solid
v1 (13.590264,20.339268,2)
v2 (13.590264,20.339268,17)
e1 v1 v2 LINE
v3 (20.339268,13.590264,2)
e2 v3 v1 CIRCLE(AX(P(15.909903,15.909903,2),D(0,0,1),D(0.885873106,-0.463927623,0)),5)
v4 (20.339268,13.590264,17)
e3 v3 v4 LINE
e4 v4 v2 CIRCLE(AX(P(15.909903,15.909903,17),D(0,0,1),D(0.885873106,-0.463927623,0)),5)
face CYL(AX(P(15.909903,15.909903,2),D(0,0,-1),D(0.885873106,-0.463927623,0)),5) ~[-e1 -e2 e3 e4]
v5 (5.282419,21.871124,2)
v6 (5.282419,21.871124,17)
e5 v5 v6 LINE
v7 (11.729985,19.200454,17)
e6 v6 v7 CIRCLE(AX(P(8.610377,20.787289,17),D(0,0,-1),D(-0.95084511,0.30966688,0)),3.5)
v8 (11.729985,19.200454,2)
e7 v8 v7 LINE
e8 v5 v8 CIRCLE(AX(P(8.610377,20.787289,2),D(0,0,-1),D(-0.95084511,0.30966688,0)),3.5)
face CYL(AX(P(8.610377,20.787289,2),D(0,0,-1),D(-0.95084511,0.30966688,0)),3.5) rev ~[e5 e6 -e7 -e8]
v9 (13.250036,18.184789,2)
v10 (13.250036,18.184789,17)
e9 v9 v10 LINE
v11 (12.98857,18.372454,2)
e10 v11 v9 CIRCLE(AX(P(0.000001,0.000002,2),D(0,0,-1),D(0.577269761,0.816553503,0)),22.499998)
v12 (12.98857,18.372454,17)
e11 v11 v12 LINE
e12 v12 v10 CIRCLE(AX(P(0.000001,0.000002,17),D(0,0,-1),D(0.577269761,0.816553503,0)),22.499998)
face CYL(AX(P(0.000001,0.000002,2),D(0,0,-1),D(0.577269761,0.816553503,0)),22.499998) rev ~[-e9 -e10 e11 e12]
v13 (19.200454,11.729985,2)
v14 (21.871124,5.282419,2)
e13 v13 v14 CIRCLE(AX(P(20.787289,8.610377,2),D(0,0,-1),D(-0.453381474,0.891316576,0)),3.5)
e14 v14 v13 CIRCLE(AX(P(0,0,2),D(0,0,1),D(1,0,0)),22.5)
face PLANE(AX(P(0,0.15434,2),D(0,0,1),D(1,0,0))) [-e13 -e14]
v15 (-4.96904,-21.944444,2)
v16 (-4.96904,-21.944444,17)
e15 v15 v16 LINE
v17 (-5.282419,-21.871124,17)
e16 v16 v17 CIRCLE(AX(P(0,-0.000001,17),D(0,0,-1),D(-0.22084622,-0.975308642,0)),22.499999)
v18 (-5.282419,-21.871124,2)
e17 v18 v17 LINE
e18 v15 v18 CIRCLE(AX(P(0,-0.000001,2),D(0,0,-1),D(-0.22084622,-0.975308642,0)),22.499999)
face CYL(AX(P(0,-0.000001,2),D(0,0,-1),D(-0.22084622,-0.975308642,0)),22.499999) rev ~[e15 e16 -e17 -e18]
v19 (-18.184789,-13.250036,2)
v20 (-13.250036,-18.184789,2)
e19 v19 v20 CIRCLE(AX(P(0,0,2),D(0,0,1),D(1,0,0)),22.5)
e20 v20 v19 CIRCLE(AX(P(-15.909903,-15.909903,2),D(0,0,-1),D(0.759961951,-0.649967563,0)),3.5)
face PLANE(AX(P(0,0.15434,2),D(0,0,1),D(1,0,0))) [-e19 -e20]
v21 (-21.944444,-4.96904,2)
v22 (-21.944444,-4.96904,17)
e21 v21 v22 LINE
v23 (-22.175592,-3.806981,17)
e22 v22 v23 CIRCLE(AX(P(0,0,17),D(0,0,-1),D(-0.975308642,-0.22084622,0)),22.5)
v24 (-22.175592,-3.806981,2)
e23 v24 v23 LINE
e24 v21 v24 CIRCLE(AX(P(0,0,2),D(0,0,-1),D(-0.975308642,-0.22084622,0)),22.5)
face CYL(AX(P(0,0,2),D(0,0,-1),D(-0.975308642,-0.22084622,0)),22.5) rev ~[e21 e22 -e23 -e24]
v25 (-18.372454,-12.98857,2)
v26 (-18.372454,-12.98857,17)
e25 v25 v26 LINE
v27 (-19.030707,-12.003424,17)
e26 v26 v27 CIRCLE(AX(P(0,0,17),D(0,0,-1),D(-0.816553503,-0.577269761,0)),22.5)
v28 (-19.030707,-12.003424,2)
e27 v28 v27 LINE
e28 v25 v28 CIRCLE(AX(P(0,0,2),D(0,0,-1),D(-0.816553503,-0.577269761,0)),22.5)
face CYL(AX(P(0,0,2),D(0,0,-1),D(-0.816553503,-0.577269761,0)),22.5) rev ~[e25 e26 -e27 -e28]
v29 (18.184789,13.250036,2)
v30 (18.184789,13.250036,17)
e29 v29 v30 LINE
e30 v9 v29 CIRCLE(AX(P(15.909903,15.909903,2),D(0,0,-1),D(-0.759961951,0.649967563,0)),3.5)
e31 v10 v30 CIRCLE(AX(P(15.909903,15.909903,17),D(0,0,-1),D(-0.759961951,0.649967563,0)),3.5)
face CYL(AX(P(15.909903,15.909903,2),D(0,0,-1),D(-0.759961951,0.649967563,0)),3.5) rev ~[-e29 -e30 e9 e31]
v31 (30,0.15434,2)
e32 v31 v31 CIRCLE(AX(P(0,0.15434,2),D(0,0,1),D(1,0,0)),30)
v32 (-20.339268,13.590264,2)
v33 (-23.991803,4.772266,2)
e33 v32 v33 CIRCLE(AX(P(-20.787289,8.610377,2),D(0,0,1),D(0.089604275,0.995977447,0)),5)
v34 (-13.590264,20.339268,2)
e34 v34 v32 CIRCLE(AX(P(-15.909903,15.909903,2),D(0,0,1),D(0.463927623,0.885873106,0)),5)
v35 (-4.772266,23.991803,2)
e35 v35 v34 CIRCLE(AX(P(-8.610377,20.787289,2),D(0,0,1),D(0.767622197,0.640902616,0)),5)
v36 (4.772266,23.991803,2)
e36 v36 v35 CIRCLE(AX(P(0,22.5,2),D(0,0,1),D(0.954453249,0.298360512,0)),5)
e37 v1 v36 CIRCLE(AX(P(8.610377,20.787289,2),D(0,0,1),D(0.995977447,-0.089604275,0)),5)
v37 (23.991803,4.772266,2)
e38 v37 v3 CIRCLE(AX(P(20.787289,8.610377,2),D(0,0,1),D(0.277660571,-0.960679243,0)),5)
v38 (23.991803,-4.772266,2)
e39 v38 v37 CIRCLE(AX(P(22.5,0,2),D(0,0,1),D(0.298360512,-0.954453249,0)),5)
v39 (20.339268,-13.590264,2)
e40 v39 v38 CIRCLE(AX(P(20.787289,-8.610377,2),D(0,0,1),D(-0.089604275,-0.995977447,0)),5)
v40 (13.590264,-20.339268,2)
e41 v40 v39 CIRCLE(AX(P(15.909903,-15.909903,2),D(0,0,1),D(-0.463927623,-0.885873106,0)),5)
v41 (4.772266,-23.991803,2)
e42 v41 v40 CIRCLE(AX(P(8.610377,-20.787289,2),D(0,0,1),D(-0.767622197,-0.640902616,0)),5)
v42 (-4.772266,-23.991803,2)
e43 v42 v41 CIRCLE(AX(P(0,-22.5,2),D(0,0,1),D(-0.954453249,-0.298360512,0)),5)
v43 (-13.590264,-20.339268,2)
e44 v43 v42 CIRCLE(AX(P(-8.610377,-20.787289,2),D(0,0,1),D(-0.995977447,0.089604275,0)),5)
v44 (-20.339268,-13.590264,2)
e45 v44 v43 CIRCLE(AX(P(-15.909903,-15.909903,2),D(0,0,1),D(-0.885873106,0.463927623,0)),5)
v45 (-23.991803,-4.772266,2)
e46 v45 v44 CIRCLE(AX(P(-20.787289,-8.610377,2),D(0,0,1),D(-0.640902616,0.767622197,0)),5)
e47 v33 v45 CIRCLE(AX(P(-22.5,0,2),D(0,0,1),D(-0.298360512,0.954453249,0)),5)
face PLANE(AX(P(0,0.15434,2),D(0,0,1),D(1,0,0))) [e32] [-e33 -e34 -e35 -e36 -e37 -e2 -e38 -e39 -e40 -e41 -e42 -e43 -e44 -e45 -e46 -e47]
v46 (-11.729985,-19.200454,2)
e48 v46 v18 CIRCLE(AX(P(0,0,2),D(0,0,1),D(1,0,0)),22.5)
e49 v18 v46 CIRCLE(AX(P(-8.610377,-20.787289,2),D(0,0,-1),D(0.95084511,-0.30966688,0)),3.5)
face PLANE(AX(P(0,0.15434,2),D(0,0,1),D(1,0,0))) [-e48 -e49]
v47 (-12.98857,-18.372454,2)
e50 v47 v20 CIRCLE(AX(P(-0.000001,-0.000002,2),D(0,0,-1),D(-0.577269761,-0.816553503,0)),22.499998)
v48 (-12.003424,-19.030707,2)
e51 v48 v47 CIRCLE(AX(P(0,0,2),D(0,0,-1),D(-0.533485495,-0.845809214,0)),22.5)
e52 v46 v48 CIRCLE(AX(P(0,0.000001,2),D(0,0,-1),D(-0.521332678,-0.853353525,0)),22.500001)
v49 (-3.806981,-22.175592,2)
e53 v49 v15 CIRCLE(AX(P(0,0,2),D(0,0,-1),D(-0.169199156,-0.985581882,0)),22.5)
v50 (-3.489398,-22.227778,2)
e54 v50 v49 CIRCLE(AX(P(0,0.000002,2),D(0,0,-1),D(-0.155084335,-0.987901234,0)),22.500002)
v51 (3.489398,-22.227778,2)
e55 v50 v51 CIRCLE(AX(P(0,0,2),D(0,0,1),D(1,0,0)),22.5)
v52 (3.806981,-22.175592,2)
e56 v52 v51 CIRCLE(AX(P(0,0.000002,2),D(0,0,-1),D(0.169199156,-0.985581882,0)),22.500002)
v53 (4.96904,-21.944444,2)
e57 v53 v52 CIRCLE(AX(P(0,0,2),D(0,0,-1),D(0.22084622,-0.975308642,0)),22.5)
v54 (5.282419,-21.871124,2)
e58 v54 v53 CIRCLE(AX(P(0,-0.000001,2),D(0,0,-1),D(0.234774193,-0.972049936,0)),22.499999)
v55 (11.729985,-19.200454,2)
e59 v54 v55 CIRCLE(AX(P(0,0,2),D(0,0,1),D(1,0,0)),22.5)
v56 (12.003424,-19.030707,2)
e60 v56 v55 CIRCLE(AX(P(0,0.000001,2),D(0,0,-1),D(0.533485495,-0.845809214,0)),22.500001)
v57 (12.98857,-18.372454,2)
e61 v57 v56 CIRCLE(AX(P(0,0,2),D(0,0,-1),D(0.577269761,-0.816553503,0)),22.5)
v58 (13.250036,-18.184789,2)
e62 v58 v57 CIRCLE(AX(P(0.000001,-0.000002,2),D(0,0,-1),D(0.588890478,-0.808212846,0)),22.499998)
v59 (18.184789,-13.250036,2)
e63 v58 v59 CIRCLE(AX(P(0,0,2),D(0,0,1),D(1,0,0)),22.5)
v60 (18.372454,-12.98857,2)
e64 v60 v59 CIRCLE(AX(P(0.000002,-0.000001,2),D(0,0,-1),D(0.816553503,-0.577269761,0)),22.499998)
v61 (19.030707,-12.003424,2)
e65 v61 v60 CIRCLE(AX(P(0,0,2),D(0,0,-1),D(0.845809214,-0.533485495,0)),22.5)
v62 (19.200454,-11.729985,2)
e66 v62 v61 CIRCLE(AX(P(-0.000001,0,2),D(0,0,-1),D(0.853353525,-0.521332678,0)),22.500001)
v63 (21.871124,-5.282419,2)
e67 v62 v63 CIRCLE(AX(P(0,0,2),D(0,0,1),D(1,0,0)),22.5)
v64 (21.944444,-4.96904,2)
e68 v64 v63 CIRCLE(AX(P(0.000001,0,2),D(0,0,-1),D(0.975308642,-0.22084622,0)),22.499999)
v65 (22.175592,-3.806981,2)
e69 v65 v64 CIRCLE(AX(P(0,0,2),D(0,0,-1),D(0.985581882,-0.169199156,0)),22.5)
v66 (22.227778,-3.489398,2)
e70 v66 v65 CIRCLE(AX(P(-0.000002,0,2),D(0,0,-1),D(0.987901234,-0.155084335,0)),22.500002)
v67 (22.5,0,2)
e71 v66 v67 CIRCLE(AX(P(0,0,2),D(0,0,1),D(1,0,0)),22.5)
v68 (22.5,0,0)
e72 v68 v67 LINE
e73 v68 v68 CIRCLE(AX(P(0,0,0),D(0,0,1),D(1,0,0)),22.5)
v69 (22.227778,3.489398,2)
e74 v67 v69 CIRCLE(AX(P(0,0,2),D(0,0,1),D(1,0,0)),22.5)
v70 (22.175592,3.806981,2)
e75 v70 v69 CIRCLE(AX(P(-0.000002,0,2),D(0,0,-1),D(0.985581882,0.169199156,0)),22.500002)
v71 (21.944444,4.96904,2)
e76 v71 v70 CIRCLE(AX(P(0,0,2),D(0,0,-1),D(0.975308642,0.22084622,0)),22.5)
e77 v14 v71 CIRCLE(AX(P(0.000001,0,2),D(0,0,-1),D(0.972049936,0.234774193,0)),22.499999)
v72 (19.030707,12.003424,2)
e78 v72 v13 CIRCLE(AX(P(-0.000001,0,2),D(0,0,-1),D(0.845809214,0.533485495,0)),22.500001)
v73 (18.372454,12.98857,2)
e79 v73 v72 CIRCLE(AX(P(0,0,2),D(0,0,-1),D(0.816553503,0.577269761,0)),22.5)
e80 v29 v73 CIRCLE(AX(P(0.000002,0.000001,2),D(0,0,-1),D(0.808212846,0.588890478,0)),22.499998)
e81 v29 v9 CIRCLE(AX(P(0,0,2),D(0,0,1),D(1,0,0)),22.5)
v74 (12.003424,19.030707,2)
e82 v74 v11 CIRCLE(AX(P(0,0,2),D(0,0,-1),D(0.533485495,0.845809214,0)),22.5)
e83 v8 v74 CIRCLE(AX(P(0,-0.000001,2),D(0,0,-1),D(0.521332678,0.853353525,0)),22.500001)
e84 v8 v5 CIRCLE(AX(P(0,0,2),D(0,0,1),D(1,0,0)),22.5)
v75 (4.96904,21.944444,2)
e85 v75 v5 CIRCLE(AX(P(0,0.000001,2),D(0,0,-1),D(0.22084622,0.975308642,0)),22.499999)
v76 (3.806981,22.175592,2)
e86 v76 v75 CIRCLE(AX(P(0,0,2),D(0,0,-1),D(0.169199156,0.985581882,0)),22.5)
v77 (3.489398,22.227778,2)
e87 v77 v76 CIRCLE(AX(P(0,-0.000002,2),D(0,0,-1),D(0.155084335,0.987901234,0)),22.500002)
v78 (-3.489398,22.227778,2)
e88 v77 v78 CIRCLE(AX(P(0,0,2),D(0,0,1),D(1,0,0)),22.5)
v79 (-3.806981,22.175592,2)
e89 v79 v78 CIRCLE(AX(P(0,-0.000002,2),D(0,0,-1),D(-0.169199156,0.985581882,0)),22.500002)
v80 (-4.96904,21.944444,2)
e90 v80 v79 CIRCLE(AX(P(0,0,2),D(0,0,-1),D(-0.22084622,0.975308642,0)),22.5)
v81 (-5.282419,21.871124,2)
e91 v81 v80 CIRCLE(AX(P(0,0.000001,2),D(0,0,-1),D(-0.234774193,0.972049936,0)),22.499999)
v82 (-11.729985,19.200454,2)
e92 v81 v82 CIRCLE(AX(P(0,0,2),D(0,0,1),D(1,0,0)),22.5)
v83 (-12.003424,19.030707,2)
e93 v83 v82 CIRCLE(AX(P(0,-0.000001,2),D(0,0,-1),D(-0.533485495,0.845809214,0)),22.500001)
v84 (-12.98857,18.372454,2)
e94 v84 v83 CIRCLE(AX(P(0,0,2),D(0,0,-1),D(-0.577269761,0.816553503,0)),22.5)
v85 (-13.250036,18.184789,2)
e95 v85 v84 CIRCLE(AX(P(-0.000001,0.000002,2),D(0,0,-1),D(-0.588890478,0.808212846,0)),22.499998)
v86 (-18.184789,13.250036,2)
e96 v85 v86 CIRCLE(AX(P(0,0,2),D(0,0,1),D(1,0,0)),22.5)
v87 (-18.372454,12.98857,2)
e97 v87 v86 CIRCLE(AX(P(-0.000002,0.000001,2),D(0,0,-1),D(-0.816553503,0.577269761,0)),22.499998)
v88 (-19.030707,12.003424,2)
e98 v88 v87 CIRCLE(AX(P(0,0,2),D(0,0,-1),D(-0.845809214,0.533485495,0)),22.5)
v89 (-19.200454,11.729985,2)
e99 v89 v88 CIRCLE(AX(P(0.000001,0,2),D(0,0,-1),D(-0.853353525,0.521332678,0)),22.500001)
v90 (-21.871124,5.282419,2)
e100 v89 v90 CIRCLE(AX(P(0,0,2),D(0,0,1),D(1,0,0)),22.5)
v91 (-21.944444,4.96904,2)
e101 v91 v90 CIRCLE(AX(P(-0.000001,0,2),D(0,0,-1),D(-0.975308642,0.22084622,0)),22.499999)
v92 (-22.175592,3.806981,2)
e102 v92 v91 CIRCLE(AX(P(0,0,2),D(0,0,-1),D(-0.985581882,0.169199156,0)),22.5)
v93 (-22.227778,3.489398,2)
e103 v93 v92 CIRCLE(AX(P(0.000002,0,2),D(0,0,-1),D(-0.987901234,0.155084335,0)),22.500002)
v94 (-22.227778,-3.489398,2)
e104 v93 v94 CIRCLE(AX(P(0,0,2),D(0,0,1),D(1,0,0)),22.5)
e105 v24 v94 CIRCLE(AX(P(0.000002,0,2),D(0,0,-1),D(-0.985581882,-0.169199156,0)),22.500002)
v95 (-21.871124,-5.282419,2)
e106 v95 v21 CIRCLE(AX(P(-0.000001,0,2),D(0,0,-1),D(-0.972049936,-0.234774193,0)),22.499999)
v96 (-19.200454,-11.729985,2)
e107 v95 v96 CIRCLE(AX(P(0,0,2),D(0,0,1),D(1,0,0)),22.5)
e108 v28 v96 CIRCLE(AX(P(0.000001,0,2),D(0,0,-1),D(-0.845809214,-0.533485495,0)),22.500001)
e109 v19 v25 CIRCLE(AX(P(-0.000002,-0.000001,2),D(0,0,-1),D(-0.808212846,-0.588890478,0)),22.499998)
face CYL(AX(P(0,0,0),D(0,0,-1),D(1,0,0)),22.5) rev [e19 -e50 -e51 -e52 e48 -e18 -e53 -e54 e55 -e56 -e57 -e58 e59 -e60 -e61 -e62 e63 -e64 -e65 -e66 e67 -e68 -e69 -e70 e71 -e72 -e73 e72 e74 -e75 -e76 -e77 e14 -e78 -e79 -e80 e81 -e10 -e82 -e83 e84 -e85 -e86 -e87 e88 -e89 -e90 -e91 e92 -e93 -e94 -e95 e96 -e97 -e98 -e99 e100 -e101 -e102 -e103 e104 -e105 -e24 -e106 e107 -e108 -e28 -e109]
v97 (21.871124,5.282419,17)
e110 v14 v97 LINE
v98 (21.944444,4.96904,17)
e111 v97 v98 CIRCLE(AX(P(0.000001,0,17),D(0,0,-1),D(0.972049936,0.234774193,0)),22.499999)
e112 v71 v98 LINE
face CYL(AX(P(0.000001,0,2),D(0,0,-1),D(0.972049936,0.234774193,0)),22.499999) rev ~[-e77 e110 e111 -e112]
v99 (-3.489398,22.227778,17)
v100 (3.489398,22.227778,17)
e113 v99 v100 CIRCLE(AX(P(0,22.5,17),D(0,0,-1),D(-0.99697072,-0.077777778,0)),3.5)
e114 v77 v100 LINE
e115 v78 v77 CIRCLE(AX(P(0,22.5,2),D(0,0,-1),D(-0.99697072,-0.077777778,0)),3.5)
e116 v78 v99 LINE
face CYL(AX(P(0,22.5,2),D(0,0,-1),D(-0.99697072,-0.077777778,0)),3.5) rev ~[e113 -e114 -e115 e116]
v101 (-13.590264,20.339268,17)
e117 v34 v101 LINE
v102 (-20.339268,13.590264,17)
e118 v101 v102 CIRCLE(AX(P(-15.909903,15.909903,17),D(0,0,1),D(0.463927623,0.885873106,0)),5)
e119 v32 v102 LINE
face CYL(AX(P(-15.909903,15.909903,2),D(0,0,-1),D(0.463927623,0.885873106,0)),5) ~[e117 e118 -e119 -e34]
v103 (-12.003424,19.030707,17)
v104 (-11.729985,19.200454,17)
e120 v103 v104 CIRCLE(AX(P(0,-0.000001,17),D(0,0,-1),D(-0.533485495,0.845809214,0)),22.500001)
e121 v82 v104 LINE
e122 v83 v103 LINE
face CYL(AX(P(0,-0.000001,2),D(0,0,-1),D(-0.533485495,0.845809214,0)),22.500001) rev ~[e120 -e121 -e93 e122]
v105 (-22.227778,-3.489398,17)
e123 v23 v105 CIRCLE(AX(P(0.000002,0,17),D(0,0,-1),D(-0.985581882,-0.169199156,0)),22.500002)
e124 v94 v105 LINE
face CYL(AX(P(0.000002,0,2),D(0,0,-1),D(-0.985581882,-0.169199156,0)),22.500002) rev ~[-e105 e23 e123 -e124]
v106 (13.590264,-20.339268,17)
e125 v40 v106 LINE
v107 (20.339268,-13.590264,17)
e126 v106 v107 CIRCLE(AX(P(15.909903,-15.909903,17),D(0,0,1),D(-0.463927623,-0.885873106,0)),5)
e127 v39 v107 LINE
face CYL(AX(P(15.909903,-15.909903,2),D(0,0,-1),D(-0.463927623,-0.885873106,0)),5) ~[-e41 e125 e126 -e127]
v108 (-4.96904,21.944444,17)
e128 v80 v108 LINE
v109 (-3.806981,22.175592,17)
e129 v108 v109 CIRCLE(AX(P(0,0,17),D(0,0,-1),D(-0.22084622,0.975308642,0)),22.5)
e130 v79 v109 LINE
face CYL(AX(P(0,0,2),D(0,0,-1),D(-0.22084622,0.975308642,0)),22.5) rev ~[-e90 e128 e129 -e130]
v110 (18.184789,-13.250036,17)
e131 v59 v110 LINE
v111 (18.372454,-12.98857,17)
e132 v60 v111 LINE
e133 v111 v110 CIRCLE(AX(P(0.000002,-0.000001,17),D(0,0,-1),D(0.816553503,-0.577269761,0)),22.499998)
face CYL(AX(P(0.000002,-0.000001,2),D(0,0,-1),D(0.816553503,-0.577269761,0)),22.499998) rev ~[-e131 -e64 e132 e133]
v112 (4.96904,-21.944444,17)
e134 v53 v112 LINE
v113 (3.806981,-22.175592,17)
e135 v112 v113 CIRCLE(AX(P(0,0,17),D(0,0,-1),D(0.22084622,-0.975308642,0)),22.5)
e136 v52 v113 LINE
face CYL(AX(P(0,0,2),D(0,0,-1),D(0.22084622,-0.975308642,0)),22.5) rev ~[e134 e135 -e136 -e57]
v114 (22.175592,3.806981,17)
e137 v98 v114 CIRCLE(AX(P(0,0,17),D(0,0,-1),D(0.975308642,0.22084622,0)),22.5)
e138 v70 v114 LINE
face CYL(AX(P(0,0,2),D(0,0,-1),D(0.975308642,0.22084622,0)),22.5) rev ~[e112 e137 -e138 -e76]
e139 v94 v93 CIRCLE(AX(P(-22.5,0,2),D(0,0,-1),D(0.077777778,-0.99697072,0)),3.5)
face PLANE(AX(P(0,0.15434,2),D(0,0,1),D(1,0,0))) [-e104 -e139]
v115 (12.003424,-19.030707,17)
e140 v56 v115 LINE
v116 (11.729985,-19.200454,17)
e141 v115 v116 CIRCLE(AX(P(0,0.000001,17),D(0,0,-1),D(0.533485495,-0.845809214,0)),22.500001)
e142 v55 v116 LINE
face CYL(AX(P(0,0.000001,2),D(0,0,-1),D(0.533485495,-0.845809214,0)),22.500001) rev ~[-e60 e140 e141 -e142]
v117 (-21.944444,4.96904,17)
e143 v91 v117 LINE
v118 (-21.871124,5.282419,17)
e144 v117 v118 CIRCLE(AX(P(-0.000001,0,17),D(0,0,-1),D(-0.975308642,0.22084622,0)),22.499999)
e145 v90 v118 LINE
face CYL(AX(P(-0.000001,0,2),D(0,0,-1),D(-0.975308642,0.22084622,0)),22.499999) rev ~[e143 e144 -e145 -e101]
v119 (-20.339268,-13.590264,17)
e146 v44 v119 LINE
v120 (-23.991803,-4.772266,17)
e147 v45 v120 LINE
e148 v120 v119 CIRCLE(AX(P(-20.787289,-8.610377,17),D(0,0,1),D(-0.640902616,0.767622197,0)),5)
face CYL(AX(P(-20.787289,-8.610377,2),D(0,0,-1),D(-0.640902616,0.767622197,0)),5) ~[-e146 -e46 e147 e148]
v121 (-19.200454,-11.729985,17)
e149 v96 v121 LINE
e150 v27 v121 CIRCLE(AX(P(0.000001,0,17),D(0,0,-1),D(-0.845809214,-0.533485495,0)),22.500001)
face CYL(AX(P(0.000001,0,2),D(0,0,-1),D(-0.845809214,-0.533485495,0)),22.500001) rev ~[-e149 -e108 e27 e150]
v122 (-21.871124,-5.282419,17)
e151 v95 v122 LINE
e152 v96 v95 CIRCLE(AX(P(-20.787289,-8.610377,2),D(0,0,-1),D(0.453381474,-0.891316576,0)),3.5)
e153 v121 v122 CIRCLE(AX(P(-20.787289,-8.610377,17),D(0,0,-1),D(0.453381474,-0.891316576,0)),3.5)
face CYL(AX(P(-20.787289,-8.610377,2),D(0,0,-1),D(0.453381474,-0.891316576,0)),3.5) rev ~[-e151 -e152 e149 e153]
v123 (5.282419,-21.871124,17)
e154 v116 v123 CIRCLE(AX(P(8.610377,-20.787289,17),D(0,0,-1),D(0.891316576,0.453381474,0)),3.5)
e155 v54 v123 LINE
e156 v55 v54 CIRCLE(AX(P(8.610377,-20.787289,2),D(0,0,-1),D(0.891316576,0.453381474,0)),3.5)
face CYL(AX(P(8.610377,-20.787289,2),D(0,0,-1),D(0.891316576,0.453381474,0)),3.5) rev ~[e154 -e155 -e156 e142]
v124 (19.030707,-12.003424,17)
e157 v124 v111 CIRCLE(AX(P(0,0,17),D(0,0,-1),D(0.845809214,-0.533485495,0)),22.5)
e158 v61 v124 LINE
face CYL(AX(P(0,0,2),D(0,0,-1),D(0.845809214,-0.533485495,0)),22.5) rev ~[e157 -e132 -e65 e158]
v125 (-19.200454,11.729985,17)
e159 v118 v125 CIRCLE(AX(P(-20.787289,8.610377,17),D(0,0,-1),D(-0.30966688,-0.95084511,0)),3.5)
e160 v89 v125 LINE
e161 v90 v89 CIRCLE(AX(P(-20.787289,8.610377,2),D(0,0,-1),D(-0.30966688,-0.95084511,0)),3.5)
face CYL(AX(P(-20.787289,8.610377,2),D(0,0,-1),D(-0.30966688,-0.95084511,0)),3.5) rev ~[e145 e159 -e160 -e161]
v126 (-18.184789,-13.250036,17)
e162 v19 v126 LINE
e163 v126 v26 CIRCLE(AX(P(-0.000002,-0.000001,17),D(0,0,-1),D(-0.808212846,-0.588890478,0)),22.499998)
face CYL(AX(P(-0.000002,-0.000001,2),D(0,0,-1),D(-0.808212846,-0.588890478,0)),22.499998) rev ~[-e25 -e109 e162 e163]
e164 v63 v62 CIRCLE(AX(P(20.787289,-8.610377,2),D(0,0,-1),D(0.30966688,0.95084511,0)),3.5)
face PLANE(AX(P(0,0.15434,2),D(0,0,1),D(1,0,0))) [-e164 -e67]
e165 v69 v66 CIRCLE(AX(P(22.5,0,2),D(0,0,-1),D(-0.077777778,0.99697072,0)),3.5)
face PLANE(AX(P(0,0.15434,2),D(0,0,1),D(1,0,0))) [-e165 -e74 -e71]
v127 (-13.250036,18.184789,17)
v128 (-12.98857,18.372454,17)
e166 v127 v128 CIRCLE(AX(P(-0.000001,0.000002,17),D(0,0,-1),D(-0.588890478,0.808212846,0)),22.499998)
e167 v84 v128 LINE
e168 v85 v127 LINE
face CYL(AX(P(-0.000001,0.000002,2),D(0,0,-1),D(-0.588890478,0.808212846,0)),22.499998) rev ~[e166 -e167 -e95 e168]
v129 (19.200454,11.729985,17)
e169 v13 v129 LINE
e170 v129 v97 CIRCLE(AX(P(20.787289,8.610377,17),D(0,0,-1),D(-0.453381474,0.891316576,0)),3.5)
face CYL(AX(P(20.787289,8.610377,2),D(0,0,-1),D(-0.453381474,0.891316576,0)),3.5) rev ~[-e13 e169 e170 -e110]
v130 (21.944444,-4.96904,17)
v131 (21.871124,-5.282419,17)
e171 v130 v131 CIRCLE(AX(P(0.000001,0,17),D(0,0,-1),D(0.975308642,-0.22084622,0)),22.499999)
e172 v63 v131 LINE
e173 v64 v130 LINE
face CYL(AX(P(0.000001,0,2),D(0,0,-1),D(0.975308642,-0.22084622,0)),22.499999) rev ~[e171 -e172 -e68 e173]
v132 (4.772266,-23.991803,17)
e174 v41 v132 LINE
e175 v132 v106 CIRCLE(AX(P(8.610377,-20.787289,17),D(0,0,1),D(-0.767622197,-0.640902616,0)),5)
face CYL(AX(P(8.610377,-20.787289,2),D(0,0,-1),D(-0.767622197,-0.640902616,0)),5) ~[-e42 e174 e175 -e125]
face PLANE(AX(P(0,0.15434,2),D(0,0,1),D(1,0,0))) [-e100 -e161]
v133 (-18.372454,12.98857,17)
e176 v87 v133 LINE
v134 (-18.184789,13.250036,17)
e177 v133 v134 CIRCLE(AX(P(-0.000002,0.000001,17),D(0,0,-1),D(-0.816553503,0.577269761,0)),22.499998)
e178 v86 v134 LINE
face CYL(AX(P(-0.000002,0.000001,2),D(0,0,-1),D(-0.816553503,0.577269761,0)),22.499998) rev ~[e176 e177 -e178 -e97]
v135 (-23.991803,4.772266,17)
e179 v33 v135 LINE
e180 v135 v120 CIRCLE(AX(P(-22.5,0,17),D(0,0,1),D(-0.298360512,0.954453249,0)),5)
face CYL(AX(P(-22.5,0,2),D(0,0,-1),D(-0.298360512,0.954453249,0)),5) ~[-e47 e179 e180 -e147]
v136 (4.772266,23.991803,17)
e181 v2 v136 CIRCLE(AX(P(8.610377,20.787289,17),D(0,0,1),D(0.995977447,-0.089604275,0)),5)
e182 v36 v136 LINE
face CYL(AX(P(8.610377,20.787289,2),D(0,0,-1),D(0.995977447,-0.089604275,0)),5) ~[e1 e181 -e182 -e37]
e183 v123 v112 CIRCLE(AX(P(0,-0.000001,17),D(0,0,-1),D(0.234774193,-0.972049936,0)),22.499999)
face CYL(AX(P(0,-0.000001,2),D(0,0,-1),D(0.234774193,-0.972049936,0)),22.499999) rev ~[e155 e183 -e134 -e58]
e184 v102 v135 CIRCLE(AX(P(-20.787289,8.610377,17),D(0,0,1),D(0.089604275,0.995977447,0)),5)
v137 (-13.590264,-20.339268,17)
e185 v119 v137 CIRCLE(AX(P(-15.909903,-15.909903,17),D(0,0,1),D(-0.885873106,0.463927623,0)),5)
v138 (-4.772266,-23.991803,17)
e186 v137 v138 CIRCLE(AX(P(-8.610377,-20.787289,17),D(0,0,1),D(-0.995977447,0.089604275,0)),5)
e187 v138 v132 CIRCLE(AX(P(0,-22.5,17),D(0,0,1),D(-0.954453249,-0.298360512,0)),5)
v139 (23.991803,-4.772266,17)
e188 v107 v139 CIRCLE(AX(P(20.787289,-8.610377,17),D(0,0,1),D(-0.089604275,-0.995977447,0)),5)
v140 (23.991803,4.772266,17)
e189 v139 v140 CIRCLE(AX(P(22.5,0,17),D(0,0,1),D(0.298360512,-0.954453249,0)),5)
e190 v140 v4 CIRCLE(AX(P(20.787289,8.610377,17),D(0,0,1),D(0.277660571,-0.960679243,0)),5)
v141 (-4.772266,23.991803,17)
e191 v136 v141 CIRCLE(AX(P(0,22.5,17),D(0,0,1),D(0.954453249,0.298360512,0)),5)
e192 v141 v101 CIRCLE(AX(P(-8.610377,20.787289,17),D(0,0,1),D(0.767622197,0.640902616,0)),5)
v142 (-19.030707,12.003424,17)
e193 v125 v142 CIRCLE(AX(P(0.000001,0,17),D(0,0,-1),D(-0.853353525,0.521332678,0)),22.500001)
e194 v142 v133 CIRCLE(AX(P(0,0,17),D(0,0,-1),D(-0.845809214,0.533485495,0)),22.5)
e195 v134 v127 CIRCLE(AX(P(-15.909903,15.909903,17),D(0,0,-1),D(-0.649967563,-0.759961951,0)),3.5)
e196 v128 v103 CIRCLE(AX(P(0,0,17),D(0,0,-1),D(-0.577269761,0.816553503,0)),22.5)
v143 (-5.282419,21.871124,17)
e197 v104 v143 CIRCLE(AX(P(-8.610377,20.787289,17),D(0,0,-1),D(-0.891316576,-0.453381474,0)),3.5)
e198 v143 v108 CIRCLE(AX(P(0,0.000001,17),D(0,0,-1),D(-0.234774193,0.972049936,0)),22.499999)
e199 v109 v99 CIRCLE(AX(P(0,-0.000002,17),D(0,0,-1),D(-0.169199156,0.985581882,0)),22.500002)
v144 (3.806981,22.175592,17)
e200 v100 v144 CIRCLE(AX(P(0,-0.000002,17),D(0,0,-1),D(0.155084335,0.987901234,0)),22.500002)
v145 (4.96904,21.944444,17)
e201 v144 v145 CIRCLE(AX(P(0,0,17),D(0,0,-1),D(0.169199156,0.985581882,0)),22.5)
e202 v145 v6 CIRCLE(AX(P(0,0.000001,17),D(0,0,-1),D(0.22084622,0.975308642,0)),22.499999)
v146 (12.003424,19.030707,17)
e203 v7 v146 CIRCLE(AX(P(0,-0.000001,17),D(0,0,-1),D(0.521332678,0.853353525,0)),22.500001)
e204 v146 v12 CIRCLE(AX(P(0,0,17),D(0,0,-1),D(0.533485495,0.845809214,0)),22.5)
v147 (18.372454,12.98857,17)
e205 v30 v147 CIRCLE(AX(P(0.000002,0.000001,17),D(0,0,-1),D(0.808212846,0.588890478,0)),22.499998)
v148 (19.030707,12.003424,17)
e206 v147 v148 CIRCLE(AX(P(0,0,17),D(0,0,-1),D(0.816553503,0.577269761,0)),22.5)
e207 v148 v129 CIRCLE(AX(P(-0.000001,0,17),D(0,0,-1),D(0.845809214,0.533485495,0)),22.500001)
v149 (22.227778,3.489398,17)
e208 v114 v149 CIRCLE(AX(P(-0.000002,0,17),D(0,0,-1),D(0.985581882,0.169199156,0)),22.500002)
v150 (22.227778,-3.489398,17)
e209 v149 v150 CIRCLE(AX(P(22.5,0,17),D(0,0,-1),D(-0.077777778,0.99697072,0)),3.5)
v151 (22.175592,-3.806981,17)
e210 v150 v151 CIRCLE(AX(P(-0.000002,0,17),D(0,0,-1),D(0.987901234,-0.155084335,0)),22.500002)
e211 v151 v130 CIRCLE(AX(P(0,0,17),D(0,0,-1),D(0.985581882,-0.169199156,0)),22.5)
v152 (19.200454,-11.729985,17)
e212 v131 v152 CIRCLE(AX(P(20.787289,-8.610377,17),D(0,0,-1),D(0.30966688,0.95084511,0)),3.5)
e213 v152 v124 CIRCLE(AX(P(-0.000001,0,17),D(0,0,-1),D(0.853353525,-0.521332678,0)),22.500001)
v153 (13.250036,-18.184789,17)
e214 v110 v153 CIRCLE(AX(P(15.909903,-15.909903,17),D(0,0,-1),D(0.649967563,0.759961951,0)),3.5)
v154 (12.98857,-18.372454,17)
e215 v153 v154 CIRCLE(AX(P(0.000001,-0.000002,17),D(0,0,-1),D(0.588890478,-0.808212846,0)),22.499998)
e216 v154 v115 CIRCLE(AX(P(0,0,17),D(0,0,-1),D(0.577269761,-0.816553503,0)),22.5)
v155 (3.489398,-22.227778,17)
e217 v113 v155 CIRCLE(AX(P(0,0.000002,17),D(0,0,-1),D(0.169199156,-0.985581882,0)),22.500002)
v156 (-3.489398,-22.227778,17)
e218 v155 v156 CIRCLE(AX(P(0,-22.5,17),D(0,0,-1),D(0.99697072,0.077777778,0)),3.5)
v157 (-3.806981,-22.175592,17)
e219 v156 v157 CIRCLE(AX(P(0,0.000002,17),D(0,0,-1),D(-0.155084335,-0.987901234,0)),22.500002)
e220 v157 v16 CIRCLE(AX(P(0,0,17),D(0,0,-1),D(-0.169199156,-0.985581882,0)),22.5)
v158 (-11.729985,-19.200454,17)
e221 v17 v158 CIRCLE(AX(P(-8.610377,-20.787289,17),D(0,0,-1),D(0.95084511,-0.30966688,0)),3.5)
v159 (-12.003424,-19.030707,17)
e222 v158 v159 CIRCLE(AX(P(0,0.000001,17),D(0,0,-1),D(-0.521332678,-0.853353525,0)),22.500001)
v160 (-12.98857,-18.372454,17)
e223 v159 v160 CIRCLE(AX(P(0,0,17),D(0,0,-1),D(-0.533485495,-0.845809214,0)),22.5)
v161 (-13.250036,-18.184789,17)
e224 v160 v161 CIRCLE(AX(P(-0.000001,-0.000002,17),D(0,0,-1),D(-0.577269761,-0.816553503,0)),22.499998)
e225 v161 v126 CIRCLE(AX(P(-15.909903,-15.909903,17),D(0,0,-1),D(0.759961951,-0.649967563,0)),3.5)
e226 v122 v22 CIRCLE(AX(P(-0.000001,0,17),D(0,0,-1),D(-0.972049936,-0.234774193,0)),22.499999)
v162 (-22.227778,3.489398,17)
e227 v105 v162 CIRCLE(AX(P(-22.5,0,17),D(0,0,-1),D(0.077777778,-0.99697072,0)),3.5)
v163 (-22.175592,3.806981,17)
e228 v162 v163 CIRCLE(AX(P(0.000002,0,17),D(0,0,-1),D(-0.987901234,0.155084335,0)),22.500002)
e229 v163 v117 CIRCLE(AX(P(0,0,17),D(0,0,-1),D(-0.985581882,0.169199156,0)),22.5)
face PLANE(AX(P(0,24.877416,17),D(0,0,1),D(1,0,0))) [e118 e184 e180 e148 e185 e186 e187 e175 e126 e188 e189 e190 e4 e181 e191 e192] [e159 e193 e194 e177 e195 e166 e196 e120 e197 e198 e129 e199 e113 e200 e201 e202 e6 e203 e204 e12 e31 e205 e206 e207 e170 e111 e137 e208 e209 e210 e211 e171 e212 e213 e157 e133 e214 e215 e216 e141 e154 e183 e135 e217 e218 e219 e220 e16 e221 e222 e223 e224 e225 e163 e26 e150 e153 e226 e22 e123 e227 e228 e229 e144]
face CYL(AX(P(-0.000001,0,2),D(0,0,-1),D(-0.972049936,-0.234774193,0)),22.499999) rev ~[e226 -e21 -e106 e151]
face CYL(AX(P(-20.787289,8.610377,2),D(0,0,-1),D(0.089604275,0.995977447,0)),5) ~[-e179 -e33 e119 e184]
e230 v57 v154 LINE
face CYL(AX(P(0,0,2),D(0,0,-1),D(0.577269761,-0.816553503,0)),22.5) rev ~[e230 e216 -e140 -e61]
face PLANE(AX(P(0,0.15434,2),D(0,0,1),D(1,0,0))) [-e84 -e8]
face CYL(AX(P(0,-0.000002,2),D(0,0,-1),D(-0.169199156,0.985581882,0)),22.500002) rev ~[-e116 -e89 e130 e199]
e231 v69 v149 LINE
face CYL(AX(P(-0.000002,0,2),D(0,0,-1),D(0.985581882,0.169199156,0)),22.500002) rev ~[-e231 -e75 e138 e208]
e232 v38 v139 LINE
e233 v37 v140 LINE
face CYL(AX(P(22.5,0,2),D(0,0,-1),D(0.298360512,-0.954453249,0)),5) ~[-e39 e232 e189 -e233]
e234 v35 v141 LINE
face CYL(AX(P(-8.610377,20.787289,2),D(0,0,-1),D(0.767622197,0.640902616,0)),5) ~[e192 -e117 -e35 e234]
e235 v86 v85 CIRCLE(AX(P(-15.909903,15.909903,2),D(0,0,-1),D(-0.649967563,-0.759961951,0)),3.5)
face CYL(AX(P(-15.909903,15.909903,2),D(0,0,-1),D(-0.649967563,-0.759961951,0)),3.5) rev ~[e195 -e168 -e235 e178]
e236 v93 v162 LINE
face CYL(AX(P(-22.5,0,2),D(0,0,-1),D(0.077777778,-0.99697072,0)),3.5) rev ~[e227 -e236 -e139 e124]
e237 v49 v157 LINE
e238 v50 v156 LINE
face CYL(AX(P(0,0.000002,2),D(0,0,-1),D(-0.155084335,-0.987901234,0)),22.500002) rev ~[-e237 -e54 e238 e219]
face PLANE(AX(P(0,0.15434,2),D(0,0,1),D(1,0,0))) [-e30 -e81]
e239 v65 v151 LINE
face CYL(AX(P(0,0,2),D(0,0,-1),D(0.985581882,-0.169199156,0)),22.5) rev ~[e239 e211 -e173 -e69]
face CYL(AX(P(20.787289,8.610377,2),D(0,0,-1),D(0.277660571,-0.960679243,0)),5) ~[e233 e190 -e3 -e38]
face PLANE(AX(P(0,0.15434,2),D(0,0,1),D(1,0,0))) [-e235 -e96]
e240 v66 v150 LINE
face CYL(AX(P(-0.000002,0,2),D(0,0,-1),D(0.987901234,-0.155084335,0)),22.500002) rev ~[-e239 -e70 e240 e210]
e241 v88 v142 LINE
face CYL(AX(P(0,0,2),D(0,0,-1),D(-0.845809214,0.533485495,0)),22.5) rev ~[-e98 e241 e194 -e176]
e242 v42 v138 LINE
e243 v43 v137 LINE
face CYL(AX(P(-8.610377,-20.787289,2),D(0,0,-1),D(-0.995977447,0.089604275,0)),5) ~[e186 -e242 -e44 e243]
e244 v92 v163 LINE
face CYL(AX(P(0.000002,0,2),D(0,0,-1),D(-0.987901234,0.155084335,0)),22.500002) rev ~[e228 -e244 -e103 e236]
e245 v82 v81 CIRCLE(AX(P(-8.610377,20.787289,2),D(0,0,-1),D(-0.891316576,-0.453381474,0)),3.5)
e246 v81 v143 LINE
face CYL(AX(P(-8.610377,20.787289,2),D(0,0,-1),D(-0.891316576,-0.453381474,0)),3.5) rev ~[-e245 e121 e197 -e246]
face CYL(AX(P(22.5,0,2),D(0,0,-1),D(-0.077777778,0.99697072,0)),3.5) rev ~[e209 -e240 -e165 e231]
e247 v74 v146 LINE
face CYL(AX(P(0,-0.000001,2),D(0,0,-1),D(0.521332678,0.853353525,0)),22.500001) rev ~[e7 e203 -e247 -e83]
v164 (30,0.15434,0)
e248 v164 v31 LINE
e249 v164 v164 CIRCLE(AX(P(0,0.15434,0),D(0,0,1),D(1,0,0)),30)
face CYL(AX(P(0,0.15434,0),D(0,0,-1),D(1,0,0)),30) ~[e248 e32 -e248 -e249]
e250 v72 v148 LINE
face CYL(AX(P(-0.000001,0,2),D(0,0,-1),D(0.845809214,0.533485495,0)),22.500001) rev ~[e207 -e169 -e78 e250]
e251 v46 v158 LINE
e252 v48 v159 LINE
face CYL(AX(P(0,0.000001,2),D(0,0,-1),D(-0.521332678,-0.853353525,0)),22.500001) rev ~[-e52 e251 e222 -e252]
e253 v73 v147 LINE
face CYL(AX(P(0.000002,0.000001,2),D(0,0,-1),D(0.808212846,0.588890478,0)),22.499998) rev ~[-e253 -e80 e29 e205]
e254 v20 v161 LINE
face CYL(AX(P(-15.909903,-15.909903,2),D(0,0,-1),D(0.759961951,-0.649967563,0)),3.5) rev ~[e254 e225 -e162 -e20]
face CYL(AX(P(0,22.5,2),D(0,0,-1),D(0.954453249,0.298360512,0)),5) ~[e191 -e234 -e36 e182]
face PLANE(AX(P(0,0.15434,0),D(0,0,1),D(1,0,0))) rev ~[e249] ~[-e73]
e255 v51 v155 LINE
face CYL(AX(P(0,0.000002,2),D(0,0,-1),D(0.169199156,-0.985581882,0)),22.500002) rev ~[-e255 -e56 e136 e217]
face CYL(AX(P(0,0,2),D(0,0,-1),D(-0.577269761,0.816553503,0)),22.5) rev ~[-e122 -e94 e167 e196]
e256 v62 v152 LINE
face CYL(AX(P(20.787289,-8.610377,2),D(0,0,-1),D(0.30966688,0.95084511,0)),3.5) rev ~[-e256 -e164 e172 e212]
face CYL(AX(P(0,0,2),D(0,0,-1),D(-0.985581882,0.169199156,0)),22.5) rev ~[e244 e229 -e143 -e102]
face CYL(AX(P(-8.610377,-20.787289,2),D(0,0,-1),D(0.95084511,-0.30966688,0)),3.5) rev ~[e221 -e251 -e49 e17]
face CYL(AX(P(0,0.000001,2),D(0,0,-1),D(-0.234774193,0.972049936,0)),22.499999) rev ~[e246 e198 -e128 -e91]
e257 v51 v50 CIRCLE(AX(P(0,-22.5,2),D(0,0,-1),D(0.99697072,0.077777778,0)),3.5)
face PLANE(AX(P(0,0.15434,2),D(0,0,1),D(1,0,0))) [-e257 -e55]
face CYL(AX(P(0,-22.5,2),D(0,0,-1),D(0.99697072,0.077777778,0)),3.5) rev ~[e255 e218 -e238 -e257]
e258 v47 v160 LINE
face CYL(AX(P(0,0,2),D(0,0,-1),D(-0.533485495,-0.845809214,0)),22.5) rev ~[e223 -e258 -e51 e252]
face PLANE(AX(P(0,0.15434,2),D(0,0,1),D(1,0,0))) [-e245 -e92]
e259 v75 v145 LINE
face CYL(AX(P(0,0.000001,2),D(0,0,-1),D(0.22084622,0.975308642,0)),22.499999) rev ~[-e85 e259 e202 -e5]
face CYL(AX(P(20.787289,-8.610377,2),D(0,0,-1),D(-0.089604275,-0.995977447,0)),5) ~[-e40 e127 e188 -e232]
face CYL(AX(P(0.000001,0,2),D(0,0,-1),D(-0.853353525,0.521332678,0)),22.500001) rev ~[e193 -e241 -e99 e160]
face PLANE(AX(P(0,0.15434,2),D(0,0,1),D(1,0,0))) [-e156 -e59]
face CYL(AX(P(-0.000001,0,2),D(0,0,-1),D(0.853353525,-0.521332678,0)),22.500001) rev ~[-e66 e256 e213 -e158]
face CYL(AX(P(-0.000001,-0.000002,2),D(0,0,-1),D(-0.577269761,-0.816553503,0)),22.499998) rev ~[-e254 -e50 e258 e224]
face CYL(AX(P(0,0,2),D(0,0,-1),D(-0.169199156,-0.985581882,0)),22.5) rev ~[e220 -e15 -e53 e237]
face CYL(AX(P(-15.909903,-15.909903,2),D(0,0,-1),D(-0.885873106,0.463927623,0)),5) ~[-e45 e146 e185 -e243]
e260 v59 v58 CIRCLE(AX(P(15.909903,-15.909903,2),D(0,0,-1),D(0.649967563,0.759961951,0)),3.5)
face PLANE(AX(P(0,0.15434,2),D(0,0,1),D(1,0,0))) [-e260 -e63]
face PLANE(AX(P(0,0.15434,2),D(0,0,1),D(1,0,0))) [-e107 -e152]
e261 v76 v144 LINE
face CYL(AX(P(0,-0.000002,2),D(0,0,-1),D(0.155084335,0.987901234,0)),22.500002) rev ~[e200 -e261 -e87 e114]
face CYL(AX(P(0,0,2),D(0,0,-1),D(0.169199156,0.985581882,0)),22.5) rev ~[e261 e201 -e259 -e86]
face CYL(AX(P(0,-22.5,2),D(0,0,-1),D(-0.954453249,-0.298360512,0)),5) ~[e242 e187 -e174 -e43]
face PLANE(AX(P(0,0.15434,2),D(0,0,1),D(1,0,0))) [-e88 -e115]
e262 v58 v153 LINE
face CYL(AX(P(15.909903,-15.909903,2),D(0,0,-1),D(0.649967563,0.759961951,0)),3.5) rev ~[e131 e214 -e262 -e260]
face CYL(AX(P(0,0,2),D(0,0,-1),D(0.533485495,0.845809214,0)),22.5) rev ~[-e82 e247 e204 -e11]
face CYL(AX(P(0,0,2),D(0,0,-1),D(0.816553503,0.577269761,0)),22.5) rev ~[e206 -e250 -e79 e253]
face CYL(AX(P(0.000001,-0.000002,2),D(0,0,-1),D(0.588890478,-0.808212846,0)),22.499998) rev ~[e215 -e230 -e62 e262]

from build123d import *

# Parameters (mm, degrees)
F0_R     = 30
F0_R_2   = 22.5
F1_DEPTH = 2
F3_DEPTH = 15


# Not quite as in the source:
# - after a boolean that leaves OpenCascade's solid faulty, fix() repairs it


with BuildPart() as f1:
    # F0 (on Top) → F1 (new body)
    with BuildSketch(Plane.XY):
        with Locations((0, 0.1543397957)):
            Circle(F0_R)
        Circle(F0_R_2, mode=Mode.SUBTRACT)
    extrude(amount=F1_DEPTH)

    # F2 (on face) → F3 (join)
    with BuildSketch(Plane.XY.offset(2)):
        with BuildLine():
            ThreePointArc((-3.8069810153, 22.1755923382), (-3.6482825778, 22.2022529089), (-3.4893975213, 22.2277777778))
            ThreePointArc((-3.4893975213, 22.2277777778), (0, 26), (3.4893975213, 22.2277777778))
            ThreePointArc((3.4893975213, 22.2277777778), (3.6482825778, 22.2022529089), (3.8069810153, 22.1755923382))
            ThreePointArc((3.8069810153, 22.1755923382), (4.1952253001, 23.1338685771), (4.7722662453, 23.991802562))
            ThreePointArc((4.7722662453, 23.991802562), (0, 27.5), (-4.7722662453, 23.991802562))
            ThreePointArc((-4.7722662453, 23.991802562), (-4.1952253001, 23.1338685771), (-3.8069810153, 22.1755923382))
        make_face()
        with BuildLine():
            ThreePointArc((-4.96903995, 21.9444444444), (-4.3895322454, 22.0676688091), (-3.8069810153, 22.1755923382))
            ThreePointArc((-3.8069810153, 22.1755923382), (-4.1952253001, 23.1338685771), (-4.7722662453, 23.991802562))
            ThreePointArc((-4.7722662453, 23.991802562), (-4.9770654419, 22.9783509036), (-4.96903995, 21.9444444444))
        make_face()
        with BuildLine():
            ThreePointArc((-5.2824193431, 21.8711235624), (-5.125860747, 21.9083443373), (-4.96903995, 21.9444444444))
            ThreePointArc((-4.96903995, 21.9444444444), (-4.9770654419, 22.9783509036), (-4.7722662453, 23.991802562))
            ThreePointArc((-4.7722662453, 23.991802562), (-10.52379439, 25.4066871441), (-13.5902644608, 20.3392681081))
            ThreePointArc((-13.5902644608, 20.3392681081), (-12.72883102, 19.7674644688), (-12.0034236314, 19.0307073207))
            ThreePointArc((-12.0034236314, 19.0307073207), (-11.8670079519, 19.1160697391), (-11.7299852446, 19.2004543218))
            ThreePointArc((-11.7299852446, 19.2004543218), (-9.9497692415, 24.0208678453), (-5.2824193431, 21.8711235624))
        make_face()
        with BuildLine():
            ThreePointArc((4.7722662453, 23.991802562), (4.1952253001, 23.1338685771), (3.8069810153, 22.1755923382))
            ThreePointArc((3.8069810153, 22.1755923382), (4.3895322454, 22.0676688091), (4.96903995, 21.9444444444))
            ThreePointArc((4.96903995, 21.9444444444), (4.9770654419, 22.9783509036), (4.7722662453, 23.991802562))
        make_face()
        with BuildLine():
            ThreePointArc((13.5902644608, 20.3392681081), (10.52379439, 25.4066871441), (4.7722662453, 23.991802562))
            ThreePointArc((4.7722662453, 23.991802562), (4.9770654419, 22.9783509036), (4.96903995, 21.9444444444))
            ThreePointArc((4.96903995, 21.9444444444), (5.125860747, 21.9083443373), (5.2824193431, 21.8711235624))
            ThreePointArc((5.2824193431, 21.8711235624), (9.9497692415, 24.0208678453), (11.7299852446, 19.2004543218))
            ThreePointArc((11.7299852446, 19.2004543218), (11.8670079519, 19.1160697391), (12.0034236314, 19.0307073207))
            ThreePointArc((12.0034236314, 19.0307073207), (12.72883102, 19.7674644688), (13.5902644608, 20.3392681081))
        make_face()
        with BuildLine():
            ThreePointArc((-12.0034236314, 19.0307073207), (-12.72883102, 19.7674644688), (-13.5902644608, 20.3392681081))
            ThreePointArc((-13.5902644608, 20.3392681081), (-13.3916430876, 19.3245876043), (-12.9885696274, 18.3724538109))
            ThreePointArc((-12.9885696274, 18.3724538109), (-12.5003302429, 18.7080662768), (-12.0034236314, 19.0307073207))
        make_face()
        with BuildLine():
            ThreePointArc((-12.9885696274, 18.3724538109), (-13.3916430876, 19.3245876043), (-13.5902644608, 20.3392681081))
            ThreePointArc((-13.5902644608, 20.3392681081), (-19.4454364826, 19.4454364826), (-20.3392681081, 13.5902644608))
            ThreePointArc((-20.3392681081, 13.5902644608), (-19.3245876043, 13.3916430876), (-18.3724538109, 12.9885696274))
            ThreePointArc((-18.3724538109, 12.9885696274), (-18.27908894, 13.1196382391), (-18.1847890469, 13.2500357478))
            ThreePointArc((-18.1847890469, 13.2500357478), (-18.3847763109, 18.3847763109), (-13.2500357478, 18.1847890469))
            ThreePointArc((-13.2500357478, 18.1847890469), (-13.1196382391, 18.27908894), (-12.9885696274, 18.3724538109))
        make_face()
        with BuildLine():
            ThreePointArc((12.9885696274, 18.3724538109), (13.3916430876, 19.3245876043), (13.5902644608, 20.3392681081))
            ThreePointArc((13.5902644608, 20.3392681081), (12.72883102, 19.7674644688), (12.0034236314, 19.0307073207))
            ThreePointArc((12.0034236314, 19.0307073207), (12.5003302429, 18.7080662768), (12.9885696274, 18.3724538109))
        make_face()
        with BuildLine():
            ThreePointArc((20.3392681081, 13.5902644608), (19.4454364826, 19.4454364826), (13.5902644608, 20.3392681081))
            ThreePointArc((13.5902644608, 20.3392681081), (13.3916430876, 19.3245876043), (12.9885696274, 18.3724538109))
            ThreePointArc((12.9885696274, 18.3724538109), (13.1196382391, 18.27908894), (13.2500357478, 18.1847890469))
            ThreePointArc((13.2500357478, 18.1847890469), (18.3847763109, 18.3847763109), (18.1847890469, 13.2500357478))
            ThreePointArc((18.1847890469, 13.2500357478), (18.27908894, 13.1196382391), (18.3724538109, 12.9885696274))
            ThreePointArc((18.3724538109, 12.9885696274), (19.3245876043, 13.3916430876), (20.3392681081, 13.5902644608))
        make_face()
        with BuildLine():
            ThreePointArc((-18.3724538109, 12.9885696274), (-19.3245876043, 13.3916430876), (-20.3392681081, 13.5902644608))
            ThreePointArc((-20.3392681081, 13.5902644608), (-19.7674644688, 12.72883102), (-19.0307073207, 12.0034236314))
            ThreePointArc((-19.0307073207, 12.0034236314), (-18.7080662768, 12.5003302429), (-18.3724538109, 12.9885696274))
        make_face()
        with BuildLine():
            ThreePointArc((-19.0307073207, 12.0034236314), (-19.7674644688, 12.72883102), (-20.3392681081, 13.5902644608))
            ThreePointArc((-20.3392681081, 13.5902644608), (-25.4066871441, 10.52379439), (-23.991802562, 4.7722662453))
            ThreePointArc((-23.991802562, 4.7722662453), (-22.9783509036, 4.9770654419), (-21.9444444444, 4.96903995))
            ThreePointArc((-21.9444444444, 4.96903995), (-21.9083443373, 5.125860747), (-21.8711235624, 5.2824193431))
            ThreePointArc((-21.8711235624, 5.2824193431), (-24.0208678453, 9.9497692415), (-19.2004543218, 11.7299852446))
            ThreePointArc((-19.2004543218, 11.7299852446), (-19.1160697391, 11.8670079519), (-19.0307073207, 12.0034236314))
        make_face()
        with BuildLine():
            ThreePointArc((19.0307073207, 12.0034236314), (19.7674644688, 12.72883102), (20.3392681081, 13.5902644608))
            ThreePointArc((20.3392681081, 13.5902644608), (19.3245876043, 13.3916430876), (18.3724538109, 12.9885696274))
            ThreePointArc((18.3724538109, 12.9885696274), (18.7080662768, 12.5003302429), (19.0307073207, 12.0034236314))
        make_face()
        with BuildLine():
            ThreePointArc((23.991802562, 4.7722662453), (25.4066871441, 10.52379439), (20.3392681081, 13.5902644608))
            ThreePointArc((20.3392681081, 13.5902644608), (19.7674644688, 12.72883102), (19.0307073207, 12.0034236314))
            ThreePointArc((19.0307073207, 12.0034236314), (19.1160697391, 11.8670079519), (19.2004543218, 11.7299852446))
            ThreePointArc((19.2004543218, 11.7299852446), (24.0208678453, 9.9497692415), (21.8711235624, 5.2824193431))
            ThreePointArc((21.8711235624, 5.2824193431), (21.9083443373, 5.125860747), (21.9444444444, 4.96903995))
            ThreePointArc((21.9444444444, 4.96903995), (22.9783509036, 4.9770654419), (23.991802562, 4.7722662453))
        make_face()
        with BuildLine():
            ThreePointArc((-21.9444444444, 4.96903995), (-22.9783509036, 4.9770654419), (-23.991802562, 4.7722662453))
            ThreePointArc((-23.991802562, 4.7722662453), (-23.1338685771, 4.1952253001), (-22.1755923382, 3.8069810153))
            ThreePointArc((-22.1755923382, 3.8069810153), (-22.0676688091, 4.3895322454), (-21.9444444444, 4.96903995))
        make_face()
        with BuildLine():
            ThreePointArc((-22.1755923382, 3.8069810153), (-23.1338685771, 4.1952253001), (-23.991802562, 4.7722662453))
            ThreePointArc((-23.991802562, 4.7722662453), (-27.5, 0), (-23.991802562, -4.7722662453))
            ThreePointArc((-23.991802562, -4.7722662453), (-23.1338685771, -4.1952253001), (-22.1755923382, -3.8069810153))
            ThreePointArc((-22.1755923382, -3.8069810153), (-22.2022529089, -3.6482825778), (-22.2277777778, -3.4893975213))
            ThreePointArc((-22.2277777778, -3.4893975213), (-26, 0), (-22.2277777778, 3.4893975213))
            ThreePointArc((-22.2277777778, 3.4893975213), (-22.2022529089, 3.6482825778), (-22.1755923382, 3.8069810153))
        make_face()
        with BuildLine():
            ThreePointArc((22.1755923382, 3.8069810153), (23.1338685771, 4.1952253001), (23.991802562, 4.7722662453))
            ThreePointArc((23.991802562, 4.7722662453), (22.9783509036, 4.9770654419), (21.9444444444, 4.96903995))
            ThreePointArc((21.9444444444, 4.96903995), (22.0676688091, 4.3895322454), (22.1755923382, 3.8069810153))
        make_face()
        with BuildLine():
            ThreePointArc((23.991802562, -4.7722662453), (27.5, 0), (23.991802562, 4.7722662453))
            ThreePointArc((23.991802562, 4.7722662453), (23.1338685771, 4.1952253001), (22.1755923382, 3.8069810153))
            ThreePointArc((22.1755923382, 3.8069810153), (22.2022529089, 3.6482825778), (22.2277777778, 3.4893975213))
            ThreePointArc((22.2277777778, 3.4893975213), (26, 0), (22.2277777778, -3.4893975213))
            ThreePointArc((22.2277777778, -3.4893975213), (22.2022529089, -3.6482825778), (22.1755923382, -3.8069810153))
            ThreePointArc((22.1755923382, -3.8069810153), (23.1338685771, -4.1952253001), (23.991802562, -4.7722662453))
        make_face()
        with BuildLine():
            ThreePointArc((-22.1755923382, -3.8069810153), (-23.1338685771, -4.1952253001), (-23.991802562, -4.7722662453))
            ThreePointArc((-23.991802562, -4.7722662453), (-22.9783509036, -4.9770654419), (-21.9444444444, -4.96903995))
            ThreePointArc((-21.9444444444, -4.96903995), (-22.0676688091, -4.3895322454), (-22.1755923382, -3.8069810153))
        make_face()
        with BuildLine():
            ThreePointArc((-21.9444444444, -4.96903995), (-22.9783509036, -4.9770654419), (-23.991802562, -4.7722662453))
            ThreePointArc((-23.991802562, -4.7722662453), (-25.4066871441, -10.52379439), (-20.3392681081, -13.5902644608))
            ThreePointArc((-20.3392681081, -13.5902644608), (-19.7674644688, -12.72883102), (-19.0307073207, -12.0034236314))
            ThreePointArc((-19.0307073207, -12.0034236314), (-19.1160697391, -11.8670079519), (-19.2004543218, -11.7299852446))
            ThreePointArc((-19.2004543218, -11.7299852446), (-24.0208678453, -9.9497692415), (-21.8711235624, -5.2824193431))
            ThreePointArc((-21.8711235624, -5.2824193431), (-21.9083443373, -5.125860747), (-21.9444444444, -4.96903995))
        make_face()
        with BuildLine():
            ThreePointArc((21.9444444444, -4.96903995), (22.9783509036, -4.9770654419), (23.991802562, -4.7722662453))
            ThreePointArc((23.991802562, -4.7722662453), (23.1338685771, -4.1952253001), (22.1755923382, -3.8069810153))
            ThreePointArc((22.1755923382, -3.8069810153), (22.0676688091, -4.3895322454), (21.9444444444, -4.96903995))
        make_face()
        with BuildLine():
            ThreePointArc((20.3392681081, -13.5902644608), (25.4066871441, -10.52379439), (23.991802562, -4.7722662453))
            ThreePointArc((23.991802562, -4.7722662453), (22.9783509036, -4.9770654419), (21.9444444444, -4.96903995))
            ThreePointArc((21.9444444444, -4.96903995), (21.9083443373, -5.125860747), (21.8711235624, -5.2824193431))
            ThreePointArc((21.8711235624, -5.2824193431), (24.0208678453, -9.9497692415), (19.2004543218, -11.7299852446))
            ThreePointArc((19.2004543218, -11.7299852446), (19.1160697391, -11.8670079519), (19.0307073207, -12.0034236314))
            ThreePointArc((19.0307073207, -12.0034236314), (19.7674644688, -12.72883102), (20.3392681081, -13.5902644608))
        make_face()
        with BuildLine():
            ThreePointArc((-19.0307073207, -12.0034236314), (-19.7674644688, -12.72883102), (-20.3392681081, -13.5902644608))
            ThreePointArc((-20.3392681081, -13.5902644608), (-19.3245876043, -13.3916430876), (-18.3724538109, -12.9885696274))
            ThreePointArc((-18.3724538109, -12.9885696274), (-18.7080662768, -12.5003302429), (-19.0307073207, -12.0034236314))
        make_face()
        with BuildLine():
            ThreePointArc((-18.3724538109, -12.9885696274), (-19.3245876043, -13.3916430876), (-20.3392681081, -13.5902644608))
            ThreePointArc((-20.3392681081, -13.5902644608), (-19.4454364826, -19.4454364826), (-13.5902644608, -20.3392681081))
            ThreePointArc((-13.5902644608, -20.3392681081), (-13.3916430876, -19.3245876043), (-12.9885696274, -18.3724538109))
            ThreePointArc((-12.9885696274, -18.3724538109), (-13.1196382391, -18.27908894), (-13.2500357478, -18.1847890469))
            ThreePointArc((-13.2500357478, -18.1847890469), (-18.3847763109, -18.3847763109), (-18.1847890469, -13.2500357478))
            ThreePointArc((-18.1847890469, -13.2500357478), (-18.27908894, -13.1196382391), (-18.3724538109, -12.9885696274))
        make_face()
        with BuildLine():
            ThreePointArc((18.3724538109, -12.9885696274), (19.3245876043, -13.3916430876), (20.3392681081, -13.5902644608))
            ThreePointArc((20.3392681081, -13.5902644608), (19.7674644688, -12.72883102), (19.0307073207, -12.0034236314))
            ThreePointArc((19.0307073207, -12.0034236314), (18.7080662768, -12.5003302429), (18.3724538109, -12.9885696274))
        make_face()
        with BuildLine():
            ThreePointArc((13.5902644608, -20.3392681081), (19.4454364826, -19.4454364826), (20.3392681081, -13.5902644608))
            ThreePointArc((20.3392681081, -13.5902644608), (19.3245876043, -13.3916430876), (18.3724538109, -12.9885696274))
            ThreePointArc((18.3724538109, -12.9885696274), (18.27908894, -13.1196382391), (18.1847890469, -13.2500357478))
            ThreePointArc((18.1847890469, -13.2500357478), (18.3847763109, -18.3847763109), (13.2500357478, -18.1847890469))
            ThreePointArc((13.2500357478, -18.1847890469), (13.1196382391, -18.27908894), (12.9885696274, -18.3724538109))
            ThreePointArc((12.9885696274, -18.3724538109), (13.3916430876, -19.3245876043), (13.5902644608, -20.3392681081))
        make_face()
        with BuildLine():
            ThreePointArc((-12.9885696274, -18.3724538109), (-13.3916430876, -19.3245876043), (-13.5902644608, -20.3392681081))
            ThreePointArc((-13.5902644608, -20.3392681081), (-12.72883102, -19.7674644688), (-12.0034236314, -19.0307073207))
            ThreePointArc((-12.0034236314, -19.0307073207), (-12.5003302429, -18.7080662768), (-12.9885696274, -18.3724538109))
        make_face()
        with BuildLine():
            ThreePointArc((-12.0034236314, -19.0307073207), (-12.72883102, -19.7674644688), (-13.5902644608, -20.3392681081))
            ThreePointArc((-13.5902644608, -20.3392681081), (-10.52379439, -25.4066871441), (-4.7722662453, -23.991802562))
            ThreePointArc((-4.7722662453, -23.991802562), (-4.9770654419, -22.9783509036), (-4.96903995, -21.9444444444))
            ThreePointArc((-4.96903995, -21.9444444444), (-5.125860747, -21.9083443373), (-5.2824193431, -21.8711235624))
            ThreePointArc((-5.2824193431, -21.8711235624), (-9.9497692415, -24.0208678453), (-11.7299852446, -19.2004543218))
            ThreePointArc((-11.7299852446, -19.2004543218), (-11.8670079519, -19.1160697391), (-12.0034236314, -19.0307073207))
        make_face()
        with BuildLine():
            ThreePointArc((12.0034236314, -19.0307073207), (12.72883102, -19.7674644688), (13.5902644608, -20.3392681081))
            ThreePointArc((13.5902644608, -20.3392681081), (13.3916430876, -19.3245876043), (12.9885696274, -18.3724538109))
            ThreePointArc((12.9885696274, -18.3724538109), (12.5003302429, -18.7080662768), (12.0034236314, -19.0307073207))
        make_face()
        with BuildLine():
            ThreePointArc((4.7722662453, -23.991802562), (10.52379439, -25.4066871441), (13.5902644608, -20.3392681081))
            ThreePointArc((13.5902644608, -20.3392681081), (12.72883102, -19.7674644688), (12.0034236314, -19.0307073207))
            ThreePointArc((12.0034236314, -19.0307073207), (11.8670079519, -19.1160697391), (11.7299852446, -19.2004543218))
            ThreePointArc((11.7299852446, -19.2004543218), (9.9497692415, -24.0208678453), (5.2824193431, -21.8711235624))
            ThreePointArc((5.2824193431, -21.8711235624), (5.125860747, -21.9083443373), (4.96903995, -21.9444444444))
            ThreePointArc((4.96903995, -21.9444444444), (4.9770654419, -22.9783509036), (4.7722662453, -23.991802562))
        make_face()
        with BuildLine():
            ThreePointArc((-4.96903995, -21.9444444444), (-4.9770654419, -22.9783509036), (-4.7722662453, -23.991802562))
            ThreePointArc((-4.7722662453, -23.991802562), (-4.1952253001, -23.1338685771), (-3.8069810153, -22.1755923382))
            ThreePointArc((-3.8069810153, -22.1755923382), (-4.3895322454, -22.0676688091), (-4.96903995, -21.9444444444))
        make_face()
        with BuildLine():
            ThreePointArc((-3.8069810153, -22.1755923382), (-4.1952253001, -23.1338685771), (-4.7722662453, -23.991802562))
            ThreePointArc((-4.7722662453, -23.991802562), (0, -27.5), (4.7722662453, -23.991802562))
            ThreePointArc((4.7722662453, -23.991802562), (4.1952253001, -23.1338685771), (3.8069810153, -22.1755923382))
            ThreePointArc((3.8069810153, -22.1755923382), (3.6482825778, -22.2022529089), (3.4893975213, -22.2277777778))
            ThreePointArc((3.4893975213, -22.2277777778), (0, -26), (-3.4893975213, -22.2277777778))
            ThreePointArc((-3.4893975213, -22.2277777778), (-3.6482825778, -22.2022529089), (-3.8069810153, -22.1755923382))
        make_face()
        with BuildLine():
            ThreePointArc((3.8069810153, -22.1755923382), (4.1952253001, -23.1338685771), (4.7722662453, -23.991802562))
            ThreePointArc((4.7722662453, -23.991802562), (4.9770654419, -22.9783509036), (4.96903995, -21.9444444444))
            ThreePointArc((4.96903995, -21.9444444444), (4.3895322454, -22.0676688091), (3.8069810153, -22.1755923382))
        make_face()
    extrude(amount=F3_DEPTH)

    add(f1.part.fix(), mode=Mode.REPLACE)


solid = f1.part
